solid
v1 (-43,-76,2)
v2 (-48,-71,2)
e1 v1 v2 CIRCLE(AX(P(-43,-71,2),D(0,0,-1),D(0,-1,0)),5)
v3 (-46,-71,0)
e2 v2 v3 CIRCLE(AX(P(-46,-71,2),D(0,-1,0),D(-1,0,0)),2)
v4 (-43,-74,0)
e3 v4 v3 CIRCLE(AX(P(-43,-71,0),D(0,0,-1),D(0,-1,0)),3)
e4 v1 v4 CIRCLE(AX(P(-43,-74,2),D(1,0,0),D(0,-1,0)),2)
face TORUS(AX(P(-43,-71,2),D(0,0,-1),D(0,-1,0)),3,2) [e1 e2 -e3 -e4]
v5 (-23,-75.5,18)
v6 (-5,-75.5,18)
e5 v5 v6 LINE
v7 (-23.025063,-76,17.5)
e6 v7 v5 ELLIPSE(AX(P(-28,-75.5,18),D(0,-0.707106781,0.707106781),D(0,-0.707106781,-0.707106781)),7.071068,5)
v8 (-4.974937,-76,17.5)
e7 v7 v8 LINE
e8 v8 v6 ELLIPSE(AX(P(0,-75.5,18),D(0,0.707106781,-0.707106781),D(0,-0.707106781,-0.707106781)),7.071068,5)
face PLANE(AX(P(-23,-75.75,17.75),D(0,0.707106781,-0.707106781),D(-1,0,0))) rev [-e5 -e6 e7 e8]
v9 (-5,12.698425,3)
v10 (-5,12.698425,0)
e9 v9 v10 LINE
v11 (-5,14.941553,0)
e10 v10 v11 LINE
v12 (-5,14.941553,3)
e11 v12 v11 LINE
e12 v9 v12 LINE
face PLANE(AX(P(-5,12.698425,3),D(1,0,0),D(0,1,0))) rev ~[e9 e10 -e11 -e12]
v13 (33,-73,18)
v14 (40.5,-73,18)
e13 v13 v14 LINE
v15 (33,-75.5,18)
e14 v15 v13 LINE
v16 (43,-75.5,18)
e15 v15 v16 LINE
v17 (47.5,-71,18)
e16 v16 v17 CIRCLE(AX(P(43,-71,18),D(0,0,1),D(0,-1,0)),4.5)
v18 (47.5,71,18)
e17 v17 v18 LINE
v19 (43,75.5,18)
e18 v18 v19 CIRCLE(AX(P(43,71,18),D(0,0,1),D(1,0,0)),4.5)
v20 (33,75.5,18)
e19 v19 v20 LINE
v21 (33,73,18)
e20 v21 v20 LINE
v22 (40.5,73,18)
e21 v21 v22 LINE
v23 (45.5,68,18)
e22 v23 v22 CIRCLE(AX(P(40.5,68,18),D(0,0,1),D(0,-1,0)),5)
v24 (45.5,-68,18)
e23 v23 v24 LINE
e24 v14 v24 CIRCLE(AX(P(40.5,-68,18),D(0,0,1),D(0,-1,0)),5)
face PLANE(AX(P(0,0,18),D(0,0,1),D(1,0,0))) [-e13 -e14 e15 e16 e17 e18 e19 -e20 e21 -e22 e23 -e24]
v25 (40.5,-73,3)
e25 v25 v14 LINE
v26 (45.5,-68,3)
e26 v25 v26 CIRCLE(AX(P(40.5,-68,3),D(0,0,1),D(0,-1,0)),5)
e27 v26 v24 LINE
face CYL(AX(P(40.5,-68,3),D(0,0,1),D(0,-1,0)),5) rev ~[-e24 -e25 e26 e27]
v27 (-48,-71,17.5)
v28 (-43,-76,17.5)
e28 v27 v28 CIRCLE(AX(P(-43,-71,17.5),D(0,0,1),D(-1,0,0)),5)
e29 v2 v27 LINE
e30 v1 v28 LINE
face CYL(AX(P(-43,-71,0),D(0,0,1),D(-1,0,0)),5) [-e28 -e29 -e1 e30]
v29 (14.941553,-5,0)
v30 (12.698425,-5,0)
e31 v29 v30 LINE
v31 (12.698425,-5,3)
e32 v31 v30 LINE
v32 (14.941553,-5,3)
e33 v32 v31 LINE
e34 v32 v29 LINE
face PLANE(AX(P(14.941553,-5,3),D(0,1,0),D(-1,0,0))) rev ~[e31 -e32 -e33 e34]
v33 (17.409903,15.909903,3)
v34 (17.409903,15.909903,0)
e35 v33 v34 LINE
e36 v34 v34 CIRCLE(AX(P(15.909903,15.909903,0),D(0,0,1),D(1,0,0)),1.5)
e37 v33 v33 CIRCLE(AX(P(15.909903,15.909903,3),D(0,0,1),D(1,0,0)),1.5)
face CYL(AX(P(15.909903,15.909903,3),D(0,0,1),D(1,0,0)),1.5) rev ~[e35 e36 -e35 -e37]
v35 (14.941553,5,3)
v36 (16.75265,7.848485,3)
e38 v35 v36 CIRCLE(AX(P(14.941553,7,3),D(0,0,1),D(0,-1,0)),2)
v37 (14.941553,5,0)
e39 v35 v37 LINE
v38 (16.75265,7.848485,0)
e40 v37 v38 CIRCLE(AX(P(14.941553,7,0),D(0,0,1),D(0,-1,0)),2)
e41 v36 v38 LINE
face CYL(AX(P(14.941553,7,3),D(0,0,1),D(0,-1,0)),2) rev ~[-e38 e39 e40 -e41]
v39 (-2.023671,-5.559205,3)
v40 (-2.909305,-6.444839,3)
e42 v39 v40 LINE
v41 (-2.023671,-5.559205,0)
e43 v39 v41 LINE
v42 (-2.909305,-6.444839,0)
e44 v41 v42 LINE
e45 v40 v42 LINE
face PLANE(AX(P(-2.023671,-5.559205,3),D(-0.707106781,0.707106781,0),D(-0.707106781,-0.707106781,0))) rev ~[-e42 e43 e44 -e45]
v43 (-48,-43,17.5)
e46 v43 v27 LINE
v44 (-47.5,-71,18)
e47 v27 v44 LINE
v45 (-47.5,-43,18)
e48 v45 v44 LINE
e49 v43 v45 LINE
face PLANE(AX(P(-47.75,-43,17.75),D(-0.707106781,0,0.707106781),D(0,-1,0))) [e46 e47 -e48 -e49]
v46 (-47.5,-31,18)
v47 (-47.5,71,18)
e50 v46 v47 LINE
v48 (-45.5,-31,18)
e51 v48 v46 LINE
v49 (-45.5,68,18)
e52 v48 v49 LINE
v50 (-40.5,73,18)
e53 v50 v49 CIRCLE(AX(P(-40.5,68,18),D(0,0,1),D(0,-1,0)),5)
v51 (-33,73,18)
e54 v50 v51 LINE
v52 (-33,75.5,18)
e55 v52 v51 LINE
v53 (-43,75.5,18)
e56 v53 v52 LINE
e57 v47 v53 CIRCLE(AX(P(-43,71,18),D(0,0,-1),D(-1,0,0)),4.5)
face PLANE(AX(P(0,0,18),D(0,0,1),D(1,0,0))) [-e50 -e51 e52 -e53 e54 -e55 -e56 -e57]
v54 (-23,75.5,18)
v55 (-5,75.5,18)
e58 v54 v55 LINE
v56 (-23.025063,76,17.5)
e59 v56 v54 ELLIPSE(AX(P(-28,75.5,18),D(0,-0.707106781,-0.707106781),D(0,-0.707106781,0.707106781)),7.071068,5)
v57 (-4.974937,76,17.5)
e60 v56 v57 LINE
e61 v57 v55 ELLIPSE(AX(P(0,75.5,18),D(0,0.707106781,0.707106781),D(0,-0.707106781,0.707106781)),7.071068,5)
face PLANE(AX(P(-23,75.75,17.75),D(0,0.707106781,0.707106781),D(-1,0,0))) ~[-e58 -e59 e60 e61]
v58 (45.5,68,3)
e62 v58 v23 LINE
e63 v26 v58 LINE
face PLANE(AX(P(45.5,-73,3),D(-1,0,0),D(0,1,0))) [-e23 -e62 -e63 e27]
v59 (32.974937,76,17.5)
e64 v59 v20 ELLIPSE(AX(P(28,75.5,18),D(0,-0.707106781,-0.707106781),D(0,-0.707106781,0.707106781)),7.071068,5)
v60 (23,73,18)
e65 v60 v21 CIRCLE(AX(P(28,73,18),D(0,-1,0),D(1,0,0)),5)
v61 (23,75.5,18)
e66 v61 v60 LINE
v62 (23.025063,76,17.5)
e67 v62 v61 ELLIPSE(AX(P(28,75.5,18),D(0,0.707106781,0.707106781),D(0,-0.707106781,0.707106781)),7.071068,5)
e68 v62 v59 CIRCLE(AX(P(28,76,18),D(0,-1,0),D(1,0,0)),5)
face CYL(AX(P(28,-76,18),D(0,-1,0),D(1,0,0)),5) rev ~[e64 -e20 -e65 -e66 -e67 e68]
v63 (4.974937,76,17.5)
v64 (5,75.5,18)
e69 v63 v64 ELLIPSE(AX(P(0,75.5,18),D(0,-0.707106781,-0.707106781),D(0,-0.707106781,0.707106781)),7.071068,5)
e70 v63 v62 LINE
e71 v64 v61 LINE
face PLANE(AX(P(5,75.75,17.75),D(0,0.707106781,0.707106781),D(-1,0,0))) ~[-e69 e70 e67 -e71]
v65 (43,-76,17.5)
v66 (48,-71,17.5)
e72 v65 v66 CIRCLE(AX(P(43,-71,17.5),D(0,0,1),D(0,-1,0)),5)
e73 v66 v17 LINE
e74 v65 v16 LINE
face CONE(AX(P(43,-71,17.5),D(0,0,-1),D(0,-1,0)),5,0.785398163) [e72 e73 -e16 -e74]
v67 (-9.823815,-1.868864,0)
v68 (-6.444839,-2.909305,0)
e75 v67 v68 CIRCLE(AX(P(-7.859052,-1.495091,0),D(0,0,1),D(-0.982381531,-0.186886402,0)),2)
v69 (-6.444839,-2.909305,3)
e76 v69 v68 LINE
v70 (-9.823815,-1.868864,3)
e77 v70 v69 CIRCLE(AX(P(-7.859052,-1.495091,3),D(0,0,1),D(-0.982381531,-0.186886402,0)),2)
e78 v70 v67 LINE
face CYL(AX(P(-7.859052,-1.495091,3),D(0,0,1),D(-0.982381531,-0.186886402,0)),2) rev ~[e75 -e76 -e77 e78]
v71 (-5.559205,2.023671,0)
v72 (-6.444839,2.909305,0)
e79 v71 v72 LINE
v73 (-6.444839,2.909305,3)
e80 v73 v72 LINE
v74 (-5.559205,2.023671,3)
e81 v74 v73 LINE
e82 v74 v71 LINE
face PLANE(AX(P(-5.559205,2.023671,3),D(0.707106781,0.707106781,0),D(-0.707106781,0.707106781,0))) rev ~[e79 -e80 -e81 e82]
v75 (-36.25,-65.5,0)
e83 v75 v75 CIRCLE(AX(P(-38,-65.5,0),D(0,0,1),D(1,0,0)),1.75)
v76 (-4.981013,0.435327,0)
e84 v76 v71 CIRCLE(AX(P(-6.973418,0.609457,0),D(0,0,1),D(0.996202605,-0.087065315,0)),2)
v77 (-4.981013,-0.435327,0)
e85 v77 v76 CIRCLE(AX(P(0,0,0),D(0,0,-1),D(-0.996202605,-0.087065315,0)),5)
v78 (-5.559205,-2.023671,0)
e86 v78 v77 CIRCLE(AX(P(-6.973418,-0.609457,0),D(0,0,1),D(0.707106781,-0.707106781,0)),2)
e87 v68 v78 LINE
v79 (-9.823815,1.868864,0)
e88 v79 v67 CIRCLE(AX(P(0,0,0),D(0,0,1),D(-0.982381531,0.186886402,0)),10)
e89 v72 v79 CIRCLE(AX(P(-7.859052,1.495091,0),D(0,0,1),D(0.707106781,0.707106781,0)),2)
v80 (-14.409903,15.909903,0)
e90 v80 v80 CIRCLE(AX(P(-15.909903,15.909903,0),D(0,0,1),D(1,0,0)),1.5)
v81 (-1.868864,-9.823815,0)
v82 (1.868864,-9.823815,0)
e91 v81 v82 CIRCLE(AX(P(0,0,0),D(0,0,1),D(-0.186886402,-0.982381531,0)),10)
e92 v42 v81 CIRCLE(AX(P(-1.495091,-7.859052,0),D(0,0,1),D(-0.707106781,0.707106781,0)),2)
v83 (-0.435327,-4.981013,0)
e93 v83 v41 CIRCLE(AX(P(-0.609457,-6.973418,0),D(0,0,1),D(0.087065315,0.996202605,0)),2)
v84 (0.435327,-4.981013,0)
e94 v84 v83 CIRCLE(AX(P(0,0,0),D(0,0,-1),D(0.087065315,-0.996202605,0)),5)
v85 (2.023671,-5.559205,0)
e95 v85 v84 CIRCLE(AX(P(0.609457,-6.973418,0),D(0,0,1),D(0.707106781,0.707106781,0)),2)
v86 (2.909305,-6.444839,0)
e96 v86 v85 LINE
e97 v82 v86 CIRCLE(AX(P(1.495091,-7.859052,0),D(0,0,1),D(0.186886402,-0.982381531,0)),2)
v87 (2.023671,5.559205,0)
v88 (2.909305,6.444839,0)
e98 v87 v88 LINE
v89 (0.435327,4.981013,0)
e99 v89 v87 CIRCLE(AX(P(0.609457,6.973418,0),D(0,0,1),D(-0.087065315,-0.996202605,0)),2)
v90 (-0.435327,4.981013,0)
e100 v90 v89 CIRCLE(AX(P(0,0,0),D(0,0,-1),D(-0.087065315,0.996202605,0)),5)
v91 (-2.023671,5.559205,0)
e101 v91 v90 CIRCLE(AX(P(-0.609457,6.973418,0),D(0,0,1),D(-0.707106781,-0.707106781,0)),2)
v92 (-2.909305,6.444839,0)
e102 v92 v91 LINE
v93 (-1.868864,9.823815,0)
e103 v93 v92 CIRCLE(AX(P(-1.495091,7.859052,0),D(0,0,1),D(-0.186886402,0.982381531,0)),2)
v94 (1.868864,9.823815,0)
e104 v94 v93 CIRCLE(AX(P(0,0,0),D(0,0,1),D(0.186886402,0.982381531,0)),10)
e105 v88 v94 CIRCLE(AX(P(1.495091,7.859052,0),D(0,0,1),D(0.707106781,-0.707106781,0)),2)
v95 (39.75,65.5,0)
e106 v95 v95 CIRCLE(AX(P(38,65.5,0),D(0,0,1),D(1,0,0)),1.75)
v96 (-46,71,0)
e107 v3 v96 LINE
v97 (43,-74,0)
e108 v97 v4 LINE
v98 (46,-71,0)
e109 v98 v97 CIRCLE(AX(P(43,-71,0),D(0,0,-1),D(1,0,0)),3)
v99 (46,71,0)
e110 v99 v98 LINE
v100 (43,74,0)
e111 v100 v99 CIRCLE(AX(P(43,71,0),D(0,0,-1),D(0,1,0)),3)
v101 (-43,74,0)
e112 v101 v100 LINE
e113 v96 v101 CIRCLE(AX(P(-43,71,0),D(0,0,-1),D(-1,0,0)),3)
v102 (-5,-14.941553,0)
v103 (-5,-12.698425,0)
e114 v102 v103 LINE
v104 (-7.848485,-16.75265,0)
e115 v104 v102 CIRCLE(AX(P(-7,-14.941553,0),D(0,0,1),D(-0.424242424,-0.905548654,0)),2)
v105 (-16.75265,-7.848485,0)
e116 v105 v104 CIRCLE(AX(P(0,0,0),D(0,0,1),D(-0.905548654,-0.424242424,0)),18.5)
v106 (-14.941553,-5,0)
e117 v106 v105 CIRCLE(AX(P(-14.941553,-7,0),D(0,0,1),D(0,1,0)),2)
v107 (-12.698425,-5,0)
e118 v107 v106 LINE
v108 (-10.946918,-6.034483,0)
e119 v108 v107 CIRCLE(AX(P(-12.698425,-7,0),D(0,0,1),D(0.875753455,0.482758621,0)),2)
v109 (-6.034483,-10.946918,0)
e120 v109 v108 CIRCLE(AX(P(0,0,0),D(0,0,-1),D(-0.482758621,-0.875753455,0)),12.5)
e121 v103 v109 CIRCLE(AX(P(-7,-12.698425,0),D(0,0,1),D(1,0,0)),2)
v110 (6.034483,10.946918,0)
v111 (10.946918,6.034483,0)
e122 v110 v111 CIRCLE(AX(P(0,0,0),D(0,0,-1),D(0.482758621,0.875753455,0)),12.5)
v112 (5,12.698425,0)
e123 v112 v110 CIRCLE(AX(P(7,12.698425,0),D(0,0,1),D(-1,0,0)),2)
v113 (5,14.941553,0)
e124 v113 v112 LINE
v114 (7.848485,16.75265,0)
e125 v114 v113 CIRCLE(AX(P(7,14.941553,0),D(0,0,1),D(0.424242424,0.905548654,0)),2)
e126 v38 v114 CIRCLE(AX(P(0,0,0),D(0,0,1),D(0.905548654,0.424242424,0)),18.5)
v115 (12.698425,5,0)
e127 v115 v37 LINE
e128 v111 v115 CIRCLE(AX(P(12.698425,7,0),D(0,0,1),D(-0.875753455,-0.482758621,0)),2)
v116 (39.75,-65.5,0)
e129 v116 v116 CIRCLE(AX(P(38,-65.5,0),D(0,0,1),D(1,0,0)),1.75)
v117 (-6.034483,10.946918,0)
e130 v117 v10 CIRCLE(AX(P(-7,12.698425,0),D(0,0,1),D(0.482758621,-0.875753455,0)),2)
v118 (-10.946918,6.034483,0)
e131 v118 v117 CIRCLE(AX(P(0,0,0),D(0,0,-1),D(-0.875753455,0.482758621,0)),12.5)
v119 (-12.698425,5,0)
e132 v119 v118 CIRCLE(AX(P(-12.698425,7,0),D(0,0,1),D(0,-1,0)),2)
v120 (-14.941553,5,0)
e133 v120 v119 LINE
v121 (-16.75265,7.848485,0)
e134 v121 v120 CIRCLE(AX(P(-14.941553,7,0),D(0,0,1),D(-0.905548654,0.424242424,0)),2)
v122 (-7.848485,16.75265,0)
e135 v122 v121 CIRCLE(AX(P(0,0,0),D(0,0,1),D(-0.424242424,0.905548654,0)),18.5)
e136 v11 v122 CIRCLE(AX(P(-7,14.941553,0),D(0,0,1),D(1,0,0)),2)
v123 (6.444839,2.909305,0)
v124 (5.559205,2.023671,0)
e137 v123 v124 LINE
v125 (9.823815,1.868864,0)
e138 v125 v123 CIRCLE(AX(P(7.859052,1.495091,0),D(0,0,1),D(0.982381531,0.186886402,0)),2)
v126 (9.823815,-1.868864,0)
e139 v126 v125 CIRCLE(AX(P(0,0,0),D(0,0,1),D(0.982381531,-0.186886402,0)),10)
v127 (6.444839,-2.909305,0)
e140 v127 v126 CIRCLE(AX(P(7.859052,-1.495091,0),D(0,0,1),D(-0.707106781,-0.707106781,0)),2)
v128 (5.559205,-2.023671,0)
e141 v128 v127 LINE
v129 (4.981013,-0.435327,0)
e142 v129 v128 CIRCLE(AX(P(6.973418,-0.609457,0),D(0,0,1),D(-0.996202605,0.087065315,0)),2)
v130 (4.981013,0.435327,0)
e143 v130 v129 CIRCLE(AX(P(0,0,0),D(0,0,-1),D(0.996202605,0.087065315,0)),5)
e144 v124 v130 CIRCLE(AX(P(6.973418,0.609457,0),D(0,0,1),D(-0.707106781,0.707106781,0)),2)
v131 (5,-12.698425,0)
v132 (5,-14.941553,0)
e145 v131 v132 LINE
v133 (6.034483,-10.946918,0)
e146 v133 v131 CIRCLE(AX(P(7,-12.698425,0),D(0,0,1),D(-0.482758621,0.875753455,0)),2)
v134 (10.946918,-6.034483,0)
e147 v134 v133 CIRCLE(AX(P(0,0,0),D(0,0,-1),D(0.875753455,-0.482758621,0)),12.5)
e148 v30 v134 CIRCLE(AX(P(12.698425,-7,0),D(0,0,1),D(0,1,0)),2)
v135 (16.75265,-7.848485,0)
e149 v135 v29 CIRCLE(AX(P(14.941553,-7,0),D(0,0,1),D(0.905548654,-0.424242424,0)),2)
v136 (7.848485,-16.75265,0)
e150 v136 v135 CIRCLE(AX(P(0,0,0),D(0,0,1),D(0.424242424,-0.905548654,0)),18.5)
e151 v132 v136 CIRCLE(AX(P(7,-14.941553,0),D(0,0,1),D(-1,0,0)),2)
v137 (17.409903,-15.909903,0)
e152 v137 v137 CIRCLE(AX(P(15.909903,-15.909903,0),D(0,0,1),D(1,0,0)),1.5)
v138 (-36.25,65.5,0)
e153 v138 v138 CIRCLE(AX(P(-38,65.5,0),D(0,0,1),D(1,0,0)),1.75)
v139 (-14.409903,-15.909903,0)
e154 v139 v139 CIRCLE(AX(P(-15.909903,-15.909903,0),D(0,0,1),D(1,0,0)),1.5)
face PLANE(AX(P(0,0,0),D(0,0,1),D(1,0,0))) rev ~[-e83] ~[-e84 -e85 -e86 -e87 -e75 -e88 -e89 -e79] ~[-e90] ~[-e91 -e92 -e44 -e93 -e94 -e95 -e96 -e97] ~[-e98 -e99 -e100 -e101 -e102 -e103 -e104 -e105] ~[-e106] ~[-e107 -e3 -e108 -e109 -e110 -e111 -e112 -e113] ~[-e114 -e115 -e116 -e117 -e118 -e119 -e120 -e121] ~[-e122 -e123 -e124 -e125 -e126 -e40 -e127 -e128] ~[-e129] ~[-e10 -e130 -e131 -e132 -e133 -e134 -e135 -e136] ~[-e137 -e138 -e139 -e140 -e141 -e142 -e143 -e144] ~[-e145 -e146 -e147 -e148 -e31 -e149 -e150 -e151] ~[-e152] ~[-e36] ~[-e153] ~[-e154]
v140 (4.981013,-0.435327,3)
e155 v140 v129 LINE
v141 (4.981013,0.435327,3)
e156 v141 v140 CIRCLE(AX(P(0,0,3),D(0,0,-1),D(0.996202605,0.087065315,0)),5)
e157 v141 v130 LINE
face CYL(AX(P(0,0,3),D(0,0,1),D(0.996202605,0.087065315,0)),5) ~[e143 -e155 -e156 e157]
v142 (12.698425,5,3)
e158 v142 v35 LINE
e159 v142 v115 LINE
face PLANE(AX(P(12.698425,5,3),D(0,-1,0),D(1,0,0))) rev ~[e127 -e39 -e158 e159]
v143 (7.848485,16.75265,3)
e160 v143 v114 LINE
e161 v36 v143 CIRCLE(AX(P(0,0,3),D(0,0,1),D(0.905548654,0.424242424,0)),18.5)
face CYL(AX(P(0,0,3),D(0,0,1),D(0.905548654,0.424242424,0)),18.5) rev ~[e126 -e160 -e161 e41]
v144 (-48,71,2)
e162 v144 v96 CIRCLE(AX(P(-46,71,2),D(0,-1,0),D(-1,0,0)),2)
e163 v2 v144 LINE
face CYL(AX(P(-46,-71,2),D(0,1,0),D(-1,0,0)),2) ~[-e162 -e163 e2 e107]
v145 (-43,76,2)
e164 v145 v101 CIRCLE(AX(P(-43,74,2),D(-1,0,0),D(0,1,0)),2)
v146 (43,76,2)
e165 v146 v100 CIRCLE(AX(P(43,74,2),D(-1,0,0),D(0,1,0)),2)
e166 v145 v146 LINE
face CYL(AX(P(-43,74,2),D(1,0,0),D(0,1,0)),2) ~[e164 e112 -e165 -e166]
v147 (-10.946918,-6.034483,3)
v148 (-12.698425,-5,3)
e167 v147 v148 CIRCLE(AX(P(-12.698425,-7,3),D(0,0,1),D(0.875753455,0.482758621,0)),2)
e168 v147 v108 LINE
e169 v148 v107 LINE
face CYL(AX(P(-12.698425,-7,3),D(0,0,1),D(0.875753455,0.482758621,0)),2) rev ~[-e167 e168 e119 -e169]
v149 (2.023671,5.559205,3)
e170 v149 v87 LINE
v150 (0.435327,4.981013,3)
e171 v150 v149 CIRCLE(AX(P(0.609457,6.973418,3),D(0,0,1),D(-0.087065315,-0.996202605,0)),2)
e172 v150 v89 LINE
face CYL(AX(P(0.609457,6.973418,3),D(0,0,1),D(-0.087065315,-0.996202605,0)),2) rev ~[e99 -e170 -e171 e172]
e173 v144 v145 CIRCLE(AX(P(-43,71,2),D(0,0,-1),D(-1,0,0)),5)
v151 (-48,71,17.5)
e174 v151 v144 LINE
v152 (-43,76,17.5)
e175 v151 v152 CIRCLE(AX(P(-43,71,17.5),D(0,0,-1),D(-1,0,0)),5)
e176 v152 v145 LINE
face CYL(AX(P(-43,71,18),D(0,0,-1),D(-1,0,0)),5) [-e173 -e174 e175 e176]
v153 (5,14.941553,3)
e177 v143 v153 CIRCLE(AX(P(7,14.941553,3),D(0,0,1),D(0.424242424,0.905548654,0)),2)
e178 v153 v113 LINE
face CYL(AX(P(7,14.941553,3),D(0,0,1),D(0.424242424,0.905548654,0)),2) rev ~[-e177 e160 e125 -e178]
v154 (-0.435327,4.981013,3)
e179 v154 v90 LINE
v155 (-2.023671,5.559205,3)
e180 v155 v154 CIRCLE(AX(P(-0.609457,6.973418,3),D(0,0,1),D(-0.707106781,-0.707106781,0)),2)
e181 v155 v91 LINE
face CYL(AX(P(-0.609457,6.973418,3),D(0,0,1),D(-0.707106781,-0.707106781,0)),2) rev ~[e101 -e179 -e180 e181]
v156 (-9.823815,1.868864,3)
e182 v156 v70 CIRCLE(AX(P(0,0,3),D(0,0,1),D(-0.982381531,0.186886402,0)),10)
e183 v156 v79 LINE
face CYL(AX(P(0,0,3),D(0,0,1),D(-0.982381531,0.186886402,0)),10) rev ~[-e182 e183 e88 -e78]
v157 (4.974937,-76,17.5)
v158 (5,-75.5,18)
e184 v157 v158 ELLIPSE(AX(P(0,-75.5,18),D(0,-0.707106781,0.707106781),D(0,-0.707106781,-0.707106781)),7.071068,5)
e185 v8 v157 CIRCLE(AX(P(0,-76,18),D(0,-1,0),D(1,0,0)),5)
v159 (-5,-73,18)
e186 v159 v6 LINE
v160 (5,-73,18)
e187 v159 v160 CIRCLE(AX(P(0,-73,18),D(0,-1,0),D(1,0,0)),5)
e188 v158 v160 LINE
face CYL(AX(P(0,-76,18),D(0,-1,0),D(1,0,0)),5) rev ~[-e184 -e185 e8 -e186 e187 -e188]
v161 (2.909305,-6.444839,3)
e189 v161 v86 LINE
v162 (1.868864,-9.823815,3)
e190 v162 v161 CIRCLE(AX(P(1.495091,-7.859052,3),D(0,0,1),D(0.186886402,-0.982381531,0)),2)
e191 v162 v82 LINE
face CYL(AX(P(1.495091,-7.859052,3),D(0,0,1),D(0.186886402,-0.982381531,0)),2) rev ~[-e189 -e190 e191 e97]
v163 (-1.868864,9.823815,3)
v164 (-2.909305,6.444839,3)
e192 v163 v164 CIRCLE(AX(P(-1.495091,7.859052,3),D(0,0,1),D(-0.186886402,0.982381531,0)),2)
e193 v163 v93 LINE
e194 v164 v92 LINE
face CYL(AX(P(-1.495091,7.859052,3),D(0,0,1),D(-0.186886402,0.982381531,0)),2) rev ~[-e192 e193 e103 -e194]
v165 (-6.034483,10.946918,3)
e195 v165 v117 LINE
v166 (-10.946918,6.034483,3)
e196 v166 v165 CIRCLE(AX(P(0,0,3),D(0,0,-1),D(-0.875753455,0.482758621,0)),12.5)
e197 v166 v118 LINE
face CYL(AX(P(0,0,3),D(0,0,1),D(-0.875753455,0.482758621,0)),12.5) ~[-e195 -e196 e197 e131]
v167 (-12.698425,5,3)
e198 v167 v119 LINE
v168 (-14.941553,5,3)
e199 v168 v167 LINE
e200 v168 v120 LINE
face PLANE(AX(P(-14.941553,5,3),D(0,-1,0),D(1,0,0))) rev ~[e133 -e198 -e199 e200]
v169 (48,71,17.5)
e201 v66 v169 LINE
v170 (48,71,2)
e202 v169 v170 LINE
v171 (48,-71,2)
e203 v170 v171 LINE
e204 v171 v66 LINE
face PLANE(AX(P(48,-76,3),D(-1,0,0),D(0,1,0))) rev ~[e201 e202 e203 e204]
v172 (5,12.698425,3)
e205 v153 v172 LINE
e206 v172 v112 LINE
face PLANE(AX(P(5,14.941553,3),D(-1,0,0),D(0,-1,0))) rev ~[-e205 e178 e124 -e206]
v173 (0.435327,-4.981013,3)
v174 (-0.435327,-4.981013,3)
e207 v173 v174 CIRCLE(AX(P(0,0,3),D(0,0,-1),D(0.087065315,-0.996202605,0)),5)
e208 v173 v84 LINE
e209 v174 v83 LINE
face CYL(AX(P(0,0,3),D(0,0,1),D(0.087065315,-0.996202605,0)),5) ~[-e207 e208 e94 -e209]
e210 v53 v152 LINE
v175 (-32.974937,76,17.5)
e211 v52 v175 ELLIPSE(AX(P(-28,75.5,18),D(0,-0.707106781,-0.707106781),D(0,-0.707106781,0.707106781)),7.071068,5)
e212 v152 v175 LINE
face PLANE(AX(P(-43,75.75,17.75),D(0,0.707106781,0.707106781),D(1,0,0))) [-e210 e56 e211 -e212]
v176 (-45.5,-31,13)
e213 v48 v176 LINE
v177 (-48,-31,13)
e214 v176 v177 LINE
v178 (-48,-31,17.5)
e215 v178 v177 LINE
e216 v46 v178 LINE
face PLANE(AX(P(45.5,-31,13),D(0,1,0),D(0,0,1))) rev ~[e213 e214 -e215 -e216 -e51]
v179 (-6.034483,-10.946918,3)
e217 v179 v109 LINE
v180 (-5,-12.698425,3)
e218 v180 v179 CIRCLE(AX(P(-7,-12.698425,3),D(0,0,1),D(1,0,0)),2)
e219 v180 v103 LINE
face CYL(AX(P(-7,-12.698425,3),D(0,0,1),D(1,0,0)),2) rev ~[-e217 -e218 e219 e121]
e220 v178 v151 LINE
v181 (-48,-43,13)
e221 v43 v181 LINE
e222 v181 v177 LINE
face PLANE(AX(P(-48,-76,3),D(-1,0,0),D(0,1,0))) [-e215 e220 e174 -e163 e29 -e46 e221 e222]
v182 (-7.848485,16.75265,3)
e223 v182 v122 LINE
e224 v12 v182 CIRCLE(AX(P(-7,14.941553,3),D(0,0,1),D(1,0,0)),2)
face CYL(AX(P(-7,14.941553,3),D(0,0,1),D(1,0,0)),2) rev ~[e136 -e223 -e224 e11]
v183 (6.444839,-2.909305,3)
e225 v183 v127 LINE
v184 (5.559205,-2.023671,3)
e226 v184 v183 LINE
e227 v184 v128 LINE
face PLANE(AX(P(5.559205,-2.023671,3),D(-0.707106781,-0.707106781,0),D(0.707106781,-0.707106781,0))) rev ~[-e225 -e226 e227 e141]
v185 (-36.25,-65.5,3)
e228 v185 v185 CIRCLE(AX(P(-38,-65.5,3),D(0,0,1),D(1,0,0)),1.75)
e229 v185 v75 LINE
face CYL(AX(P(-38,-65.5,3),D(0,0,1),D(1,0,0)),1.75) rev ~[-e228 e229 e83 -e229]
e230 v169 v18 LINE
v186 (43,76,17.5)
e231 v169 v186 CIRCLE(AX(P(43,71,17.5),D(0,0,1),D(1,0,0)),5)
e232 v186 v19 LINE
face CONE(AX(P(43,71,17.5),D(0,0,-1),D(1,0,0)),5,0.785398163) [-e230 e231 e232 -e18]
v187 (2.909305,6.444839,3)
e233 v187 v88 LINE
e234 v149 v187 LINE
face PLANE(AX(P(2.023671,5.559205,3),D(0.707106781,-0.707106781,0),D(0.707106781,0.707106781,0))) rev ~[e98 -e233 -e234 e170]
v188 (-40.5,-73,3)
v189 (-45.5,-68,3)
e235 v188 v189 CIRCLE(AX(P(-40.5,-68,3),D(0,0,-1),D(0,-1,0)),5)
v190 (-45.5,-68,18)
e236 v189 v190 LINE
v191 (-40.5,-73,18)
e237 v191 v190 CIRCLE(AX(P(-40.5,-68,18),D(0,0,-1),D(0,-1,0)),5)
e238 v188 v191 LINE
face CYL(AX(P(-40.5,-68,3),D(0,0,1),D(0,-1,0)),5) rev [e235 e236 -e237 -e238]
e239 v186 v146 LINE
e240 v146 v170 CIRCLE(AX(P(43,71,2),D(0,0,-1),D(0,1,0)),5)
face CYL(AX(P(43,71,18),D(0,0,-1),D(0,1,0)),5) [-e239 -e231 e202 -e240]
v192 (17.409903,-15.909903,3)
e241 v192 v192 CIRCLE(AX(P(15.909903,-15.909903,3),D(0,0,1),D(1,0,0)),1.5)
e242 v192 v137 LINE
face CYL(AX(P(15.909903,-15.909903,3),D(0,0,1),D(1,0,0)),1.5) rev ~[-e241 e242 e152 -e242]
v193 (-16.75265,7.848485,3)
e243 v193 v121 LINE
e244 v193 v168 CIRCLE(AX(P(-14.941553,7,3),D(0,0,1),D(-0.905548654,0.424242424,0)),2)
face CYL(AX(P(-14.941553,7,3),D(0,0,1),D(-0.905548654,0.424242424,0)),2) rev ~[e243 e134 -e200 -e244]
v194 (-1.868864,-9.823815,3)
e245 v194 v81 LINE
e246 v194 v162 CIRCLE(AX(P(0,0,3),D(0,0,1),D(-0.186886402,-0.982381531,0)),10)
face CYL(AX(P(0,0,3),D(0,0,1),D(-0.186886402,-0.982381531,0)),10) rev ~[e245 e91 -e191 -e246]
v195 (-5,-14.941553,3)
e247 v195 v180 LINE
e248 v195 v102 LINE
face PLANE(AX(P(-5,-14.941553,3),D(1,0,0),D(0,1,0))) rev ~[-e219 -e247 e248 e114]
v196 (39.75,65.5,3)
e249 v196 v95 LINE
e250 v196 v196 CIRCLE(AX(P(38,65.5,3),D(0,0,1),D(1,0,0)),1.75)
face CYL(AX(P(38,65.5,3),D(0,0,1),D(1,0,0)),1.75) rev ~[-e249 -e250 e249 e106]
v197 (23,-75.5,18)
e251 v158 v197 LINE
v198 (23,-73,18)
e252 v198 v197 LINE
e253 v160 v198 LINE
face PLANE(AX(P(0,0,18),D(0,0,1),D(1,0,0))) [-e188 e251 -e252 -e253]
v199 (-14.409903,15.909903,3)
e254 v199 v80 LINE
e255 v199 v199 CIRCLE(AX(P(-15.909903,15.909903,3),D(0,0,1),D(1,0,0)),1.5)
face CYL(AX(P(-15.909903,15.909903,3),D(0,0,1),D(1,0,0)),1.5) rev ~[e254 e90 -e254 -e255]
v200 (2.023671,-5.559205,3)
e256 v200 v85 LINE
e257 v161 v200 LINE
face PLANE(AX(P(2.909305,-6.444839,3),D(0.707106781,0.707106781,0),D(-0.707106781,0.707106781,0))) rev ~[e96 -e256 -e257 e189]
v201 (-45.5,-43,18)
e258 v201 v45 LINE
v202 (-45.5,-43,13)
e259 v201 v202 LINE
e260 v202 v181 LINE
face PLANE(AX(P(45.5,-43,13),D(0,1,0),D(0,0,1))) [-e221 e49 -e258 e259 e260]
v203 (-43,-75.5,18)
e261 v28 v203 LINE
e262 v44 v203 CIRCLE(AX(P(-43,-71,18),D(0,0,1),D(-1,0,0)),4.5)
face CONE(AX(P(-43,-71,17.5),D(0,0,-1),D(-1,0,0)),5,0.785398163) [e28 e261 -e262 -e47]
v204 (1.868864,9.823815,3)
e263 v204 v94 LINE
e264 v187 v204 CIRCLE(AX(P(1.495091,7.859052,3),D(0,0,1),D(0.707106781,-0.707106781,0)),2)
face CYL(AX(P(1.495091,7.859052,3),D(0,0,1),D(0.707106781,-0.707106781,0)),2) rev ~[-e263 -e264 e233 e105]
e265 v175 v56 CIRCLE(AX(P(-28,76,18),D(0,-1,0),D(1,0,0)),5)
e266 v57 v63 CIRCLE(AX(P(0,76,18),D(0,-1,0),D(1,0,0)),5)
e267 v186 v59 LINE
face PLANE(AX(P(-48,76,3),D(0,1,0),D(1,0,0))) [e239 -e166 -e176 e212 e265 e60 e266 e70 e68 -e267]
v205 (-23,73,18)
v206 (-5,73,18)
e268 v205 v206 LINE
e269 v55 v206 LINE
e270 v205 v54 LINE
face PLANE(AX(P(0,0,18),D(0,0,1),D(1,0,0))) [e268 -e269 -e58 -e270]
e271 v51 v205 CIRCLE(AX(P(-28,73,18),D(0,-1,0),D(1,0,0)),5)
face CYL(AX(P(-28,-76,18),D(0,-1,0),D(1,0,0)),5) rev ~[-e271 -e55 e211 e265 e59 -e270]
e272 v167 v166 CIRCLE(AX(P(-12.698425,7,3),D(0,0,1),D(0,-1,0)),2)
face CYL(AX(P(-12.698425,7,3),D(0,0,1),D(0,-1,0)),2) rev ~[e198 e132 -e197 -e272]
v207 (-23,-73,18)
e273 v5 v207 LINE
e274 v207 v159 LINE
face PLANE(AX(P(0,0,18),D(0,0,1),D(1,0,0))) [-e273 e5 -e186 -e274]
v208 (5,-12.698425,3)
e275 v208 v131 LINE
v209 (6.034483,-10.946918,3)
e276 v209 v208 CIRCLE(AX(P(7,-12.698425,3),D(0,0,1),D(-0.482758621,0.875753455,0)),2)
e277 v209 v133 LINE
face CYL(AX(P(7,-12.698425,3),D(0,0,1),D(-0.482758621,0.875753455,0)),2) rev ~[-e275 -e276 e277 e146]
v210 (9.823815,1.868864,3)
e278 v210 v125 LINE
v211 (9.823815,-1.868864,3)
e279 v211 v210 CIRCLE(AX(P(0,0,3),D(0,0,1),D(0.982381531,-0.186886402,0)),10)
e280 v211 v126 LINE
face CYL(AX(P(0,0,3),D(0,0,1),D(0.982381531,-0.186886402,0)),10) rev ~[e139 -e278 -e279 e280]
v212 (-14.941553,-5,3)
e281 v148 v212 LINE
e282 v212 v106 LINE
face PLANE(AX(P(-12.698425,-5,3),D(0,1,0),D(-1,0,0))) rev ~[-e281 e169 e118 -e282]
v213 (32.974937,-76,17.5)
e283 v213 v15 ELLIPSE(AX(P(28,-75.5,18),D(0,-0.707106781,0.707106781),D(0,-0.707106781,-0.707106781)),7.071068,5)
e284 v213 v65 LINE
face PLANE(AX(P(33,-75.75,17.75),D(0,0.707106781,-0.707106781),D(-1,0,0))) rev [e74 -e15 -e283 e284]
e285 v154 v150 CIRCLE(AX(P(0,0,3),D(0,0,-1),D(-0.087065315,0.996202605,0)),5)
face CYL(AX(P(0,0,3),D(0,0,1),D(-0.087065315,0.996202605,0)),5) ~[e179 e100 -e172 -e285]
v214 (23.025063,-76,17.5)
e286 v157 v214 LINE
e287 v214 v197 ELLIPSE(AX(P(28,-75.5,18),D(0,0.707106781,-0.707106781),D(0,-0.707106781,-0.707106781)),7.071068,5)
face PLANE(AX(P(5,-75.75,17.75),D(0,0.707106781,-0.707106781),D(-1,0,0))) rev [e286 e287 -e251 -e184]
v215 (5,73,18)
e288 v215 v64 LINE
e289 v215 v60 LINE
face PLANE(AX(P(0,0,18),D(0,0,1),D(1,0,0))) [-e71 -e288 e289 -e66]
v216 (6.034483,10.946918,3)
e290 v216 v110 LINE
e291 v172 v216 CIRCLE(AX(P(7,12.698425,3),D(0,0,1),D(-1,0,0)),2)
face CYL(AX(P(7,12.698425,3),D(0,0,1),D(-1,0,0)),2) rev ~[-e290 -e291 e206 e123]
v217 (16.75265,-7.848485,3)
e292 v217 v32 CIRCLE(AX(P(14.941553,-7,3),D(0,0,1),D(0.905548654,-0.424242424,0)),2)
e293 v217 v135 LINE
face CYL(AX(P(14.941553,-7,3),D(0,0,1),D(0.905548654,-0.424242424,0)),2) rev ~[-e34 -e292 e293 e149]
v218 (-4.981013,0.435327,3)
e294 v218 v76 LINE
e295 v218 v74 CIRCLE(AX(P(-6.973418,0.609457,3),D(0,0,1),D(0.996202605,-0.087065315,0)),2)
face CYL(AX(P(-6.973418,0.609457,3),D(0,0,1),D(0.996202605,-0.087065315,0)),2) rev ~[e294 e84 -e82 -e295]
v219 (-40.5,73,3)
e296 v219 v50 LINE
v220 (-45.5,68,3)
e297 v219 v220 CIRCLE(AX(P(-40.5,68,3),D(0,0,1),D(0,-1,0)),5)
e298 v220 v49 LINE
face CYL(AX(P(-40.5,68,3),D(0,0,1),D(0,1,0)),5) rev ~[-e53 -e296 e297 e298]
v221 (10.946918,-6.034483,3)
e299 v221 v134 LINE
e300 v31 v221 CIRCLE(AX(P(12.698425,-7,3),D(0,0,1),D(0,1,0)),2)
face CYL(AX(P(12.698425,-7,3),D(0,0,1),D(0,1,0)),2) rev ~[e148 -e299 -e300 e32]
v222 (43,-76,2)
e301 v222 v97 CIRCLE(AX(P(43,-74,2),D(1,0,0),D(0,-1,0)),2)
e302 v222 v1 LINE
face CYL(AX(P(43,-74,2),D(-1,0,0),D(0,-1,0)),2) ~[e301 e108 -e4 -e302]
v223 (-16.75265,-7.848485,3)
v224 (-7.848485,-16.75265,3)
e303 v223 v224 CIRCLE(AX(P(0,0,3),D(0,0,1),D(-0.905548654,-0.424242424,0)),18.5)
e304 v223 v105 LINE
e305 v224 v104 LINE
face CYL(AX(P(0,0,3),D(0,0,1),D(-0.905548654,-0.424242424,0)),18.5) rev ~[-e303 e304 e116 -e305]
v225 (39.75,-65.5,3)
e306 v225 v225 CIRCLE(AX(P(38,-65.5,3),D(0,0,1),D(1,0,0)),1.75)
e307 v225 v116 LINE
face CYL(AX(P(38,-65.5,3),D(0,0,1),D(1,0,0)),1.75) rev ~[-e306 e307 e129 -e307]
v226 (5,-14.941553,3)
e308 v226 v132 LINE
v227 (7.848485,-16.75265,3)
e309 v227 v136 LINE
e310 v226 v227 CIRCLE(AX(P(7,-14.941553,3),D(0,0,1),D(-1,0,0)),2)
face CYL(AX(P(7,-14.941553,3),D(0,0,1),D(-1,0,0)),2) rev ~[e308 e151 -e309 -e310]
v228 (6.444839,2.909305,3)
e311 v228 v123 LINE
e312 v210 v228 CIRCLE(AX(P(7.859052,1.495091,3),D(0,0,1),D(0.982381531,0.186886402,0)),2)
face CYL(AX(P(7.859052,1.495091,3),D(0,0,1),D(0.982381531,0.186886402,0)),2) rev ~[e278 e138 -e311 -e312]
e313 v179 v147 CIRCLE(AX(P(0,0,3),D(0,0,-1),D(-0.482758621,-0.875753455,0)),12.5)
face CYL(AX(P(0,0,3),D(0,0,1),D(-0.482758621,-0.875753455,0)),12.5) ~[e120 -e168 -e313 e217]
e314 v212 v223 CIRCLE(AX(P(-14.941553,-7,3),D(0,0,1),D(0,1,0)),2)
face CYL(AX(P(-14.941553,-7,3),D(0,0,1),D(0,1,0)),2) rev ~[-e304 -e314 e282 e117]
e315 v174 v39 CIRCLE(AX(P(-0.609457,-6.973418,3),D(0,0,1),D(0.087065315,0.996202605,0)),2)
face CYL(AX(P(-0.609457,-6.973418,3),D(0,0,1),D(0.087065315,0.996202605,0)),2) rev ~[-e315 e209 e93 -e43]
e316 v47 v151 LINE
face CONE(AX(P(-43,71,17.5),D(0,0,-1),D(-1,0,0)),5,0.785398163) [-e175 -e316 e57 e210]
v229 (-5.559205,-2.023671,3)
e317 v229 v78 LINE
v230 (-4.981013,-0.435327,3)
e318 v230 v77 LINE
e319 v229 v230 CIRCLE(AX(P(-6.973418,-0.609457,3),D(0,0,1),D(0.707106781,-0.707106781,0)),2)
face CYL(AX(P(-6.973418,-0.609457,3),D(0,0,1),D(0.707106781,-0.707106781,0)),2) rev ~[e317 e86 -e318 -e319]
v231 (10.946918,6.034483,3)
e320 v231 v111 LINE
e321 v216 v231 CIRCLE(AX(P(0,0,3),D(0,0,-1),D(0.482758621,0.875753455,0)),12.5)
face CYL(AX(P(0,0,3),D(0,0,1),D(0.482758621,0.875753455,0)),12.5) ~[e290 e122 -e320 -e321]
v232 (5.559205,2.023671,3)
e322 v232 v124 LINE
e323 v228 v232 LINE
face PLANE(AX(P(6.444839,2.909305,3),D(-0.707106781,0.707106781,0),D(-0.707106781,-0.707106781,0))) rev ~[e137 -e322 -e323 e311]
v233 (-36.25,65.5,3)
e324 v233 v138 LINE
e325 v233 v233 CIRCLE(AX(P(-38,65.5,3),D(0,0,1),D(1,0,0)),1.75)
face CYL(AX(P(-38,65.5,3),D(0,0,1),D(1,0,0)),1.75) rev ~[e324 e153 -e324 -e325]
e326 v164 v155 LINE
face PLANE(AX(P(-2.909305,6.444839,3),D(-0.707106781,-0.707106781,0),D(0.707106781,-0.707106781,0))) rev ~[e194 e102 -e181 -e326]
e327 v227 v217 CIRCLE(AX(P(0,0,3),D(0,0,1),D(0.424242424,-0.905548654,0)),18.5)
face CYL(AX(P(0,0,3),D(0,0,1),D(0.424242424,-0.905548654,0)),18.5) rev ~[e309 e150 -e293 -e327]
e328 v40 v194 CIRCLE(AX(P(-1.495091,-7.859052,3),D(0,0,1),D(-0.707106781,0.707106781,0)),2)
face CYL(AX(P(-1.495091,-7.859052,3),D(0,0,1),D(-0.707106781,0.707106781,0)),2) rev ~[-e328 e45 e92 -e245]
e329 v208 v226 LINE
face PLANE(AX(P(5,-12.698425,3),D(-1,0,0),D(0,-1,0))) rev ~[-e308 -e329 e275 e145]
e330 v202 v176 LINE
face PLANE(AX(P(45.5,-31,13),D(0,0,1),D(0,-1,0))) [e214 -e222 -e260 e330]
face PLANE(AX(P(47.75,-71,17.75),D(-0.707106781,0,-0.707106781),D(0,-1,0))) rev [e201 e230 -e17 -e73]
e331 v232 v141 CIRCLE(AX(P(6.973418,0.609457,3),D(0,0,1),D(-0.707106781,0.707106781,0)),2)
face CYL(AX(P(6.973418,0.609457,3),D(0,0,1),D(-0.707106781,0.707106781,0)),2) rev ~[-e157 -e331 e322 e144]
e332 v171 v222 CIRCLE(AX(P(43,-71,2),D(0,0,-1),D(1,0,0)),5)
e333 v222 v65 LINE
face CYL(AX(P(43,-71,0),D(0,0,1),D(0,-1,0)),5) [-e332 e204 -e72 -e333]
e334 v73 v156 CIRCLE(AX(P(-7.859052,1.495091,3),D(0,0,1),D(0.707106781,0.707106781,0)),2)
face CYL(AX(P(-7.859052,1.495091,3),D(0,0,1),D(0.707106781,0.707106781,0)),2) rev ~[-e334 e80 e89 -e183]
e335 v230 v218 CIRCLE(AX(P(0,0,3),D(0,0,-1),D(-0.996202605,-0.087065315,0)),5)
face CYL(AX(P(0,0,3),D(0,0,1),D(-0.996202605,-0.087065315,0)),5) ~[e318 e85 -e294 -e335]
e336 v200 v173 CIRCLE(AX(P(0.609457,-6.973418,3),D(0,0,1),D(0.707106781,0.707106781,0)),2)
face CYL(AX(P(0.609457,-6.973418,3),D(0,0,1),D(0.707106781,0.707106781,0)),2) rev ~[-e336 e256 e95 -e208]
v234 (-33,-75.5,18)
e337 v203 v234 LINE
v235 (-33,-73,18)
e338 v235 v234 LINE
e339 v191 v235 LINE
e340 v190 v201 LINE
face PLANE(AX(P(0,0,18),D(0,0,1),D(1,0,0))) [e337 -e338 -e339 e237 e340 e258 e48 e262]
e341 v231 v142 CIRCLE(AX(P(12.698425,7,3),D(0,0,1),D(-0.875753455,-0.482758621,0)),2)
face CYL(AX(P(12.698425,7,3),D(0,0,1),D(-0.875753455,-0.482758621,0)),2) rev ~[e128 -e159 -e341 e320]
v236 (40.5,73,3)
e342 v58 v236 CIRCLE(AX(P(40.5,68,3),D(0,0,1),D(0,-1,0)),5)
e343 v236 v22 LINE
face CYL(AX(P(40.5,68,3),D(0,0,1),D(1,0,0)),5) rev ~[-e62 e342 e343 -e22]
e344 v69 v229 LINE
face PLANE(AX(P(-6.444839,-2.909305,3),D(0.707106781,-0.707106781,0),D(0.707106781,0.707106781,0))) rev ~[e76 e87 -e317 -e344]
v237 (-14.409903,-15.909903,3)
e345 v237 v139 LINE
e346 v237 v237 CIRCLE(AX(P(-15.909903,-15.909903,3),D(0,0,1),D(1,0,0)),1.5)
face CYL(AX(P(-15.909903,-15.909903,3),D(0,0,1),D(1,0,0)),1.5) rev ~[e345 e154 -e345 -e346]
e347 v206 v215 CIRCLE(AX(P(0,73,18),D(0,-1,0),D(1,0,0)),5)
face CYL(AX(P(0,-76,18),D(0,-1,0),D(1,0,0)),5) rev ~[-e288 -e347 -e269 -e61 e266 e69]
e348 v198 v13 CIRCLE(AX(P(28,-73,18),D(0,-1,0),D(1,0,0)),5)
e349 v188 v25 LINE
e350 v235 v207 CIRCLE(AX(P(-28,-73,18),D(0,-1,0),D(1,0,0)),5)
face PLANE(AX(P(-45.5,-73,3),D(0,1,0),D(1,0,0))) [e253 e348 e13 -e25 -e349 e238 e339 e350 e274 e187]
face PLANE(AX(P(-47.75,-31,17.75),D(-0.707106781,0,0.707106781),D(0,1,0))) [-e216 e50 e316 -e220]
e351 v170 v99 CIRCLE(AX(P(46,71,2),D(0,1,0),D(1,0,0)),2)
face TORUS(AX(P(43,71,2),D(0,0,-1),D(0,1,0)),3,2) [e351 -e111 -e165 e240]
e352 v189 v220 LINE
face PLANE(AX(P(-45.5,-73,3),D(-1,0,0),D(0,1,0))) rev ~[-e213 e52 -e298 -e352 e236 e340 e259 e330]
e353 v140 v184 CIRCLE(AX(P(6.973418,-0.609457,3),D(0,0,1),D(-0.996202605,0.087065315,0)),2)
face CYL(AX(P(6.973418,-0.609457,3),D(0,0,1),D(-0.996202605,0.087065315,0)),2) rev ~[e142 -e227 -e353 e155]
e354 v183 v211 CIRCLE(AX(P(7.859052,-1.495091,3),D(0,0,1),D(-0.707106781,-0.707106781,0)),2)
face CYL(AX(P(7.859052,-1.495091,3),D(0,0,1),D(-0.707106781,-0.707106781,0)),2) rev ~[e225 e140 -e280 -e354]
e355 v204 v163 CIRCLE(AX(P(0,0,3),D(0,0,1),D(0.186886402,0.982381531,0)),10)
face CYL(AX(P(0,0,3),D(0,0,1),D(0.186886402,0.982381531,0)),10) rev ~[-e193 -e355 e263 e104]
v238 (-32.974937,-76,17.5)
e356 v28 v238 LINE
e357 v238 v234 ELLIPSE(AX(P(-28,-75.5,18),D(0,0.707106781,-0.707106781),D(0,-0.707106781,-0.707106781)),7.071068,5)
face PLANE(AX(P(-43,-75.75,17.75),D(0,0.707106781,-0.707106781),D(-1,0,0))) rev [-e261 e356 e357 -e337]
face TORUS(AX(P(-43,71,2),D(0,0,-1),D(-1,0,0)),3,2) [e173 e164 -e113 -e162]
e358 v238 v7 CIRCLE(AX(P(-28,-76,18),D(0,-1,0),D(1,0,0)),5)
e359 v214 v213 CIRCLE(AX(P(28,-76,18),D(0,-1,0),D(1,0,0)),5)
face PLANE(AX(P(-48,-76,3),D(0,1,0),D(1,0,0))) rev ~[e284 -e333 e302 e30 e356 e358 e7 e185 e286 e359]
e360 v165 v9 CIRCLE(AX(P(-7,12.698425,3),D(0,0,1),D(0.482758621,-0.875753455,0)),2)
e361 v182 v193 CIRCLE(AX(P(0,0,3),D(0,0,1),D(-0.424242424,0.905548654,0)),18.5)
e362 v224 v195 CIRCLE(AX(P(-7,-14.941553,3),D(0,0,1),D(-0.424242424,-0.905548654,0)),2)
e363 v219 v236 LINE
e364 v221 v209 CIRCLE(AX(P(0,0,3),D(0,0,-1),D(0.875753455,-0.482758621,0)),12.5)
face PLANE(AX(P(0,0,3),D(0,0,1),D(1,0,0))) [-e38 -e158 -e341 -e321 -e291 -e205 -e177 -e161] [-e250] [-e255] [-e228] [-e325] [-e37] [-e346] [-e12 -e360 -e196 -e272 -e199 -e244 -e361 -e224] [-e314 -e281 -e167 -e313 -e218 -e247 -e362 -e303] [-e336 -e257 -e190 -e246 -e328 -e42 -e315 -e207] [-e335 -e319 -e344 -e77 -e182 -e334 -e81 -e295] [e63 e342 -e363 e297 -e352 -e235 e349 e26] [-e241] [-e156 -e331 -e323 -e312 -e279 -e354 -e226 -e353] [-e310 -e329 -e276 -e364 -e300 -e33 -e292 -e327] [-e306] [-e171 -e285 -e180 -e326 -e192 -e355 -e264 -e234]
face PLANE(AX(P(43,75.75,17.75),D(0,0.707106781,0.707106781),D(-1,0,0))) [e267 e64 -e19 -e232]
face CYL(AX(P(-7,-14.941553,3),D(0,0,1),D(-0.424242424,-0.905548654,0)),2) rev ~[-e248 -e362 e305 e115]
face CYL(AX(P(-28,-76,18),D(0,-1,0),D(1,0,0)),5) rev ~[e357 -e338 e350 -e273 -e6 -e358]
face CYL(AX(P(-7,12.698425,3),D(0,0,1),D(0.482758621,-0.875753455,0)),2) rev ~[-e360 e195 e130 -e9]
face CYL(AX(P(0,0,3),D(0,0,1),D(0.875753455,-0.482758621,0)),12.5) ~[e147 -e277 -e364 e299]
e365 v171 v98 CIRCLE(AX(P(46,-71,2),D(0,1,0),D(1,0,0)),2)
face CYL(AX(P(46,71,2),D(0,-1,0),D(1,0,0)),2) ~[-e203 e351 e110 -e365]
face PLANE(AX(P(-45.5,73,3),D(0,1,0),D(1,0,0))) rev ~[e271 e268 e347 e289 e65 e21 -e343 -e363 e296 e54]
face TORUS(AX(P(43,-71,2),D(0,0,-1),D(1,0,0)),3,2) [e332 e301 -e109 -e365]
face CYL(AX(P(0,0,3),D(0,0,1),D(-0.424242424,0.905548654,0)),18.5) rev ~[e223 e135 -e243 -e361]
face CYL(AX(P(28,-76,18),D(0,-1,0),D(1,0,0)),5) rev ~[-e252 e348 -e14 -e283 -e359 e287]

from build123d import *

# Parameters (mm, degrees)
F0_W        = 96
F0_H        = 152
F1_DEPTH    = 3
F2_W        = 96
F2_H        = 152
F2_W_2      = 91
F2_H_2      = 146
F3_DEPTH    = 15
F4_R        = 1.75
F5_DEPTH    = 3
F6_R        = 5
F7_R        = 2
F8_R        = 5
F9_DEPTH    = 152.001
F10_W       = 12
F10_H       = 20.9038736373
F11_DEPTH   = 93.501
F12_R       = 1.5
F13_DEPTH   = 3
F14_C1_SIZE = 0.5
F14_C2_SIZE = 0.5
F14_C3_SIZE = 0.5
F14_C4_SIZE = 0.5
F14_C5_SIZE = 0.5
F14_C6_SIZE = 0.5
F14_C7_SIZE = 0.5


with BuildPart() as f1:
    # F0 (on Top) → F1 (new body)
    with BuildSketch(Plane.XY):
        Rectangle(F0_W, F0_H)
    extrude(amount=F1_DEPTH)

    # F2 (on face) → F3 (join)
    with BuildSketch(Plane.XY.offset(3)):
        Rectangle(F2_W, F2_H)
        Rectangle(F2_W_2, F2_H_2, mode=Mode.SUBTRACT)
    extrude(amount=F3_DEPTH)

    # F4 (on face) → F5 (cut, through all)
    with BuildSketch(Plane.XY.offset(3)):
        with Locations((-38, 65.5)):
            Circle(F4_R)
        with Locations((38, 65.5)):
            Circle(F4_R)
        with Locations((-38, -65.5)):
            Circle(F4_R)
        with Locations((38, -65.5)):
            Circle(F4_R)
    extrude(amount=-F5_DEPTH, mode=Mode.SUBTRACT)

    # F6
    f6_edges = [f1.edges().sort_by_distance(p)[0] for p in [
        (-48, -76, 9),
        (48, -76, 9),
        (45.5, -73, 10.5),
        (-45.5, -73, 10.5),
        (-48, 76, 9),
        (-45.5, 73, 10.5),
        (48, 76, 9),
        (45.5, 73, 10.5),
    ]]
    fillet(f6_edges, radius=F6_R)

    # F7
    f7_edges = [f1.edges().sort_by_distance(p)[0] for p in [
        (-48, 0, 0),
    ]]
    fillet(f7_edges, radius=F7_R)

    # F8 (on face) → F9 (cut, through all)
    with BuildSketch(Plane.XZ.offset(76)):
        with Locations((-28, 18)):
            Circle(F8_R)
        with Locations((0, 18)):
            Circle(F8_R)
        with Locations((28, 18)):
            Circle(F8_R)
    extrude(amount=-F9_DEPTH, mode=Mode.SUBTRACT)

    # F10 (on face) → F11 (cut, through all)
    with BuildSketch(Plane(origin=(45.5, 0, 0), x_dir=(0, -1, 0), z_dir=(-1, 0, 0))):
        with Locations((37, 23.4519368187)):
            Rectangle(F10_W, F10_H)
    extrude(amount=F11_DEPTH, mode=Mode.SUBTRACT)

    # F12 (on face) → F13 (cut, through all)
    with BuildSketch(Plane.XY.offset(3)):
        with Locations((-15.9099025767, -15.9099025767)):
            Circle(F12_R)
        with Locations((15.9099025767, -15.9099025767)):
            Circle(F12_R)
        with Locations((15.9099025767, 15.9099025767)):
            Circle(F12_R)
        with Locations((-15.9099025767, 15.9099025767)):
            Circle(F12_R)
        with BuildLine():
            ThreePointArc((14.9415527975, 5), (16.6292982903, 5.92691326), (16.7526501063, 7.8484848485))
            ThreePointArc((16.7526501063, 7.8484848485), (13.081475452, 13.081475452), (7.8484848485, 16.7526501063))
            ThreePointArc((7.8484848485, 16.7526501063), (5.92691326, 16.6292982903), (5, 14.9415527975))
            Line((5, 14.9415527975), (5, 12.6984250992))
            ThreePointArc((5, 12.6984250992), (5.2779322774, 11.6813298438), (6.0344827586, 10.946918189))
            ThreePointArc((6.0344827586, 10.946918189), (8.8388347648, 8.8388347648), (10.946918189, 6.0344827586))
            ThreePointArc((10.946918189, 6.0344827586), (11.6813298438, 5.2779322774), (12.6984250992, 5))
            Line((12.6984250992, 5), (14.9415527975, 5))
        make_face()
        with BuildLine():
            Line((14.9415527975, -5), (12.6984250992, -5))
            ThreePointArc((12.6984250992, -5), (11.6813298438, -5.2779322774), (10.946918189, -6.0344827586))
            ThreePointArc((10.946918189, -6.0344827586), (8.8388347648, -8.8388347648), (6.0344827586, -10.946918189))
            ThreePointArc((6.0344827586, -10.946918189), (5.2779322774, -11.6813298438), (5, -12.6984250992))
            Line((5, -12.6984250992), (5, -14.9415527975))
            ThreePointArc((5, -14.9415527975), (5.92691326, -16.6292982903), (7.8484848485, -16.7526501063))
            ThreePointArc((7.8484848485, -16.7526501063), (13.081475452, -13.081475452), (16.7526501063, -7.8484848485))
            ThreePointArc((16.7526501063, -7.8484848485), (16.6292982903, -5.92691326), (14.9415527975, -5))
        make_face()
        with BuildLine():
            ThreePointArc((-10.946918189, 6.0344827586), (-8.8388347648, 8.8388347648), (-6.0344827586, 10.946918189))
            ThreePointArc((-6.0344827586, 10.946918189), (-5.2779322774, 11.6813298438), (-5, 12.6984250992))
            Line((-5, 12.6984250992), (-5, 14.9415527975))
            ThreePointArc((-5, 14.9415527975), (-5.92691326, 16.6292982903), (-7.8484848485, 16.7526501063))
            ThreePointArc((-7.8484848485, 16.7526501063), (-13.081475452, 13.081475452), (-16.7526501063, 7.8484848485))
            ThreePointArc((-16.7526501063, 7.8484848485), (-16.6292982903, 5.92691326), (-14.9415527975, 5))
            Line((-14.9415527975, 5), (-12.6984250992, 5))
            ThreePointArc((-12.6984250992, 5), (-11.6813298438, 5.2779322774), (-10.946918189, 6.0344827586))
        make_face()
        with BuildLine():
            ThreePointArc((-6.0344827586, -10.946918189), (-8.8388347648, -8.8388347648), (-10.946918189, -6.0344827586))
            ThreePointArc((-10.946918189, -6.0344827586), (-11.6813298438, -5.2779322774), (-12.6984250992, -5))
            Line((-12.6984250992, -5), (-14.9415527975, -5))
            ThreePointArc((-14.9415527975, -5), (-16.6292982903, -5.92691326), (-16.7526501063, -7.8484848485))
            ThreePointArc((-16.7526501063, -7.8484848485), (-13.081475452, -13.081475452), (-7.8484848485, -16.7526501063))
            ThreePointArc((-7.8484848485, -16.7526501063), (-5.92691326, -16.6292982903), (-5, -14.9415527975))
            Line((-5, -14.9415527975), (-5, -12.6984250992))
            ThreePointArc((-5, -12.6984250992), (-5.2779322774, -11.6813298438), (-6.0344827586, -10.946918189))
        make_face()
        with BuildLine():
            ThreePointArc((6.4448386864, -2.9093047805), (8.447614421, -3.4065290459), (9.823815311, -1.8688640227))
            ThreePointArc((9.823815311, -1.8688640227), (10, 0), (9.823815311, 1.8688640227))
            ThreePointArc((9.823815311, 1.8688640227), (8.447614421, 3.4065290459), (6.4448386864, 2.9093047805))
            Line((6.4448386864, 2.9093047805), (5.559204675, 2.0236707691))
            ThreePointArc((5.559204675, 2.0236707691), (5.0940640438, 1.2935827909), (4.9810130267, 0.4353265762))
            ThreePointArc((4.9810130267, 0.4353265762), (5, 0), (4.9810130267, -0.4353265762))
            ThreePointArc((4.9810130267, -0.4353265762), (5.0940640438, -1.2935827909), (5.559204675, -2.0236707691))
            Line((5.559204675, -2.0236707691), (6.4448386864, -2.9093047805))
        make_face()
        with BuildLine():
            Line((2.9093047805, -6.4448386864), (2.0236707691, -5.559204675))
            ThreePointArc((2.0236707691, -5.559204675), (1.2935827909, -5.0940640438), (0.4353265762, -4.9810130267))
            ThreePointArc((0.4353265762, -4.9810130267), (0, -5), (-0.4353265762, -4.9810130267))
            ThreePointArc((-0.4353265762, -4.9810130267), (-1.2935827909, -5.0940640438), (-2.0236707691, -5.559204675))
            Line((-2.0236707691, -5.559204675), (-2.9093047805, -6.4448386864))
            ThreePointArc((-2.9093047805, -6.4448386864), (-3.4065290459, -8.447614421), (-1.8688640227, -9.823815311))
            ThreePointArc((-1.8688640227, -9.823815311), (0, -10), (1.8688640227, -9.823815311))
            ThreePointArc((1.8688640227, -9.823815311), (3.4065290459, -8.447614421), (2.9093047805, -6.4448386864))
        make_face()
        with BuildLine():
            ThreePointArc((-0.4353265762, 4.9810130267), (0, 5), (0.4353265762, 4.9810130267))
            ThreePointArc((0.4353265762, 4.9810130267), (1.2935827909, 5.0940640438), (2.0236707691, 5.559204675))
            Line((2.0236707691, 5.559204675), (2.9093047805, 6.4448386864))
            ThreePointArc((2.9093047805, 6.4448386864), (3.4065290459, 8.447614421), (1.8688640227, 9.823815311))
            ThreePointArc((1.8688640227, 9.823815311), (0, 10), (-1.8688640227, 9.823815311))
            ThreePointArc((-1.8688640227, 9.823815311), (-3.4065290459, 8.447614421), (-2.9093047805, 6.4448386864))
            Line((-2.9093047805, 6.4448386864), (-2.0236707691, 5.559204675))
            ThreePointArc((-2.0236707691, 5.559204675), (-1.2935827909, 5.0940640438), (-0.4353265762, 4.9810130267))
        make_face()
        with BuildLine():
            ThreePointArc((-4.9810130267, -0.4353265762), (-5, 0), (-4.9810130267, 0.4353265762))
            ThreePointArc((-4.9810130267, 0.4353265762), (-5.0940640438, 1.2935827909), (-5.559204675, 2.0236707691))
            Line((-5.559204675, 2.0236707691), (-6.4448386864, 2.9093047805))
            ThreePointArc((-6.4448386864, 2.9093047805), (-8.447614421, 3.4065290459), (-9.823815311, 1.8688640227))
            ThreePointArc((-9.823815311, 1.8688640227), (-10, 0), (-9.823815311, -1.8688640227))
            ThreePointArc((-9.823815311, -1.8688640227), (-8.447614421, -3.4065290459), (-6.4448386864, -2.9093047805))
            Line((-6.4448386864, -2.9093047805), (-5.559204675, -2.0236707691))
            ThreePointArc((-5.559204675, -2.0236707691), (-5.0940640438, -1.2935827909), (-4.9810130267, -0.4353265762))
        make_face()
    extrude(amount=-F13_DEPTH, mode=Mode.SUBTRACT)

    # F14: chamfer of 0.5 on 7 edges, made by hand

    # F14_c1
    f14_c1_edges = [f1.edges().sort_by_distance(p)[0] for p in [
        (38, -76, 18),
        (46.5355339059, -74.5355339059, 18),
        (48, 0, 18),
        (46.5355339059, 74.5355339059, 18),
        (38, 76, 18),
    ]]
    chamfer(f14_c1_edges, length=F14_C1_SIZE)

    # F14_c2
    f14_c2_edges = [f1.edges().sort_by_distance(p)[0] for p in [
        (14, -76, 18),
    ]]
    chamfer(f14_c2_edges, length=F14_C2_SIZE)

    # F14_c3
    f14_c3_edges = [f1.edges().sort_by_distance(p)[0] for p in [
        (-14, -76, 18),
    ]]
    chamfer(f14_c3_edges, length=F14_C3_SIZE)

    # F14_c4
    f14_c4_edges = [f1.edges().sort_by_distance(p)[0] for p in [
        (-38, -76, 18),
        (-46.5355339059, -74.5355339059, 18),
        (-48, -57, 18),
    ]]
    chamfer(f14_c4_edges, length=F14_C4_SIZE)

    # F14_c5
    f14_c5_edges = [f1.edges().sort_by_distance(p)[0] for p in [
        (-38, 76, 18),
        (-48, 20, 18),
        (-46.5355339059, 74.5355339059, 18),
    ]]
    chamfer(f14_c5_edges, length=F14_C5_SIZE)

    # F14_c6
    f14_c6_edges = [f1.edges().sort_by_distance(p)[0] for p in [
        (-14, 76, 18),
    ]]
    chamfer(f14_c6_edges, length=F14_C6_SIZE)

    # F14_c7
    f14_c7_edges = [f1.edges().sort_by_distance(p)[0] for p in [
        (14, 76, 18),
    ]]
    chamfer(f14_c7_edges, length=F14_C7_SIZE)


solid = f1.part
